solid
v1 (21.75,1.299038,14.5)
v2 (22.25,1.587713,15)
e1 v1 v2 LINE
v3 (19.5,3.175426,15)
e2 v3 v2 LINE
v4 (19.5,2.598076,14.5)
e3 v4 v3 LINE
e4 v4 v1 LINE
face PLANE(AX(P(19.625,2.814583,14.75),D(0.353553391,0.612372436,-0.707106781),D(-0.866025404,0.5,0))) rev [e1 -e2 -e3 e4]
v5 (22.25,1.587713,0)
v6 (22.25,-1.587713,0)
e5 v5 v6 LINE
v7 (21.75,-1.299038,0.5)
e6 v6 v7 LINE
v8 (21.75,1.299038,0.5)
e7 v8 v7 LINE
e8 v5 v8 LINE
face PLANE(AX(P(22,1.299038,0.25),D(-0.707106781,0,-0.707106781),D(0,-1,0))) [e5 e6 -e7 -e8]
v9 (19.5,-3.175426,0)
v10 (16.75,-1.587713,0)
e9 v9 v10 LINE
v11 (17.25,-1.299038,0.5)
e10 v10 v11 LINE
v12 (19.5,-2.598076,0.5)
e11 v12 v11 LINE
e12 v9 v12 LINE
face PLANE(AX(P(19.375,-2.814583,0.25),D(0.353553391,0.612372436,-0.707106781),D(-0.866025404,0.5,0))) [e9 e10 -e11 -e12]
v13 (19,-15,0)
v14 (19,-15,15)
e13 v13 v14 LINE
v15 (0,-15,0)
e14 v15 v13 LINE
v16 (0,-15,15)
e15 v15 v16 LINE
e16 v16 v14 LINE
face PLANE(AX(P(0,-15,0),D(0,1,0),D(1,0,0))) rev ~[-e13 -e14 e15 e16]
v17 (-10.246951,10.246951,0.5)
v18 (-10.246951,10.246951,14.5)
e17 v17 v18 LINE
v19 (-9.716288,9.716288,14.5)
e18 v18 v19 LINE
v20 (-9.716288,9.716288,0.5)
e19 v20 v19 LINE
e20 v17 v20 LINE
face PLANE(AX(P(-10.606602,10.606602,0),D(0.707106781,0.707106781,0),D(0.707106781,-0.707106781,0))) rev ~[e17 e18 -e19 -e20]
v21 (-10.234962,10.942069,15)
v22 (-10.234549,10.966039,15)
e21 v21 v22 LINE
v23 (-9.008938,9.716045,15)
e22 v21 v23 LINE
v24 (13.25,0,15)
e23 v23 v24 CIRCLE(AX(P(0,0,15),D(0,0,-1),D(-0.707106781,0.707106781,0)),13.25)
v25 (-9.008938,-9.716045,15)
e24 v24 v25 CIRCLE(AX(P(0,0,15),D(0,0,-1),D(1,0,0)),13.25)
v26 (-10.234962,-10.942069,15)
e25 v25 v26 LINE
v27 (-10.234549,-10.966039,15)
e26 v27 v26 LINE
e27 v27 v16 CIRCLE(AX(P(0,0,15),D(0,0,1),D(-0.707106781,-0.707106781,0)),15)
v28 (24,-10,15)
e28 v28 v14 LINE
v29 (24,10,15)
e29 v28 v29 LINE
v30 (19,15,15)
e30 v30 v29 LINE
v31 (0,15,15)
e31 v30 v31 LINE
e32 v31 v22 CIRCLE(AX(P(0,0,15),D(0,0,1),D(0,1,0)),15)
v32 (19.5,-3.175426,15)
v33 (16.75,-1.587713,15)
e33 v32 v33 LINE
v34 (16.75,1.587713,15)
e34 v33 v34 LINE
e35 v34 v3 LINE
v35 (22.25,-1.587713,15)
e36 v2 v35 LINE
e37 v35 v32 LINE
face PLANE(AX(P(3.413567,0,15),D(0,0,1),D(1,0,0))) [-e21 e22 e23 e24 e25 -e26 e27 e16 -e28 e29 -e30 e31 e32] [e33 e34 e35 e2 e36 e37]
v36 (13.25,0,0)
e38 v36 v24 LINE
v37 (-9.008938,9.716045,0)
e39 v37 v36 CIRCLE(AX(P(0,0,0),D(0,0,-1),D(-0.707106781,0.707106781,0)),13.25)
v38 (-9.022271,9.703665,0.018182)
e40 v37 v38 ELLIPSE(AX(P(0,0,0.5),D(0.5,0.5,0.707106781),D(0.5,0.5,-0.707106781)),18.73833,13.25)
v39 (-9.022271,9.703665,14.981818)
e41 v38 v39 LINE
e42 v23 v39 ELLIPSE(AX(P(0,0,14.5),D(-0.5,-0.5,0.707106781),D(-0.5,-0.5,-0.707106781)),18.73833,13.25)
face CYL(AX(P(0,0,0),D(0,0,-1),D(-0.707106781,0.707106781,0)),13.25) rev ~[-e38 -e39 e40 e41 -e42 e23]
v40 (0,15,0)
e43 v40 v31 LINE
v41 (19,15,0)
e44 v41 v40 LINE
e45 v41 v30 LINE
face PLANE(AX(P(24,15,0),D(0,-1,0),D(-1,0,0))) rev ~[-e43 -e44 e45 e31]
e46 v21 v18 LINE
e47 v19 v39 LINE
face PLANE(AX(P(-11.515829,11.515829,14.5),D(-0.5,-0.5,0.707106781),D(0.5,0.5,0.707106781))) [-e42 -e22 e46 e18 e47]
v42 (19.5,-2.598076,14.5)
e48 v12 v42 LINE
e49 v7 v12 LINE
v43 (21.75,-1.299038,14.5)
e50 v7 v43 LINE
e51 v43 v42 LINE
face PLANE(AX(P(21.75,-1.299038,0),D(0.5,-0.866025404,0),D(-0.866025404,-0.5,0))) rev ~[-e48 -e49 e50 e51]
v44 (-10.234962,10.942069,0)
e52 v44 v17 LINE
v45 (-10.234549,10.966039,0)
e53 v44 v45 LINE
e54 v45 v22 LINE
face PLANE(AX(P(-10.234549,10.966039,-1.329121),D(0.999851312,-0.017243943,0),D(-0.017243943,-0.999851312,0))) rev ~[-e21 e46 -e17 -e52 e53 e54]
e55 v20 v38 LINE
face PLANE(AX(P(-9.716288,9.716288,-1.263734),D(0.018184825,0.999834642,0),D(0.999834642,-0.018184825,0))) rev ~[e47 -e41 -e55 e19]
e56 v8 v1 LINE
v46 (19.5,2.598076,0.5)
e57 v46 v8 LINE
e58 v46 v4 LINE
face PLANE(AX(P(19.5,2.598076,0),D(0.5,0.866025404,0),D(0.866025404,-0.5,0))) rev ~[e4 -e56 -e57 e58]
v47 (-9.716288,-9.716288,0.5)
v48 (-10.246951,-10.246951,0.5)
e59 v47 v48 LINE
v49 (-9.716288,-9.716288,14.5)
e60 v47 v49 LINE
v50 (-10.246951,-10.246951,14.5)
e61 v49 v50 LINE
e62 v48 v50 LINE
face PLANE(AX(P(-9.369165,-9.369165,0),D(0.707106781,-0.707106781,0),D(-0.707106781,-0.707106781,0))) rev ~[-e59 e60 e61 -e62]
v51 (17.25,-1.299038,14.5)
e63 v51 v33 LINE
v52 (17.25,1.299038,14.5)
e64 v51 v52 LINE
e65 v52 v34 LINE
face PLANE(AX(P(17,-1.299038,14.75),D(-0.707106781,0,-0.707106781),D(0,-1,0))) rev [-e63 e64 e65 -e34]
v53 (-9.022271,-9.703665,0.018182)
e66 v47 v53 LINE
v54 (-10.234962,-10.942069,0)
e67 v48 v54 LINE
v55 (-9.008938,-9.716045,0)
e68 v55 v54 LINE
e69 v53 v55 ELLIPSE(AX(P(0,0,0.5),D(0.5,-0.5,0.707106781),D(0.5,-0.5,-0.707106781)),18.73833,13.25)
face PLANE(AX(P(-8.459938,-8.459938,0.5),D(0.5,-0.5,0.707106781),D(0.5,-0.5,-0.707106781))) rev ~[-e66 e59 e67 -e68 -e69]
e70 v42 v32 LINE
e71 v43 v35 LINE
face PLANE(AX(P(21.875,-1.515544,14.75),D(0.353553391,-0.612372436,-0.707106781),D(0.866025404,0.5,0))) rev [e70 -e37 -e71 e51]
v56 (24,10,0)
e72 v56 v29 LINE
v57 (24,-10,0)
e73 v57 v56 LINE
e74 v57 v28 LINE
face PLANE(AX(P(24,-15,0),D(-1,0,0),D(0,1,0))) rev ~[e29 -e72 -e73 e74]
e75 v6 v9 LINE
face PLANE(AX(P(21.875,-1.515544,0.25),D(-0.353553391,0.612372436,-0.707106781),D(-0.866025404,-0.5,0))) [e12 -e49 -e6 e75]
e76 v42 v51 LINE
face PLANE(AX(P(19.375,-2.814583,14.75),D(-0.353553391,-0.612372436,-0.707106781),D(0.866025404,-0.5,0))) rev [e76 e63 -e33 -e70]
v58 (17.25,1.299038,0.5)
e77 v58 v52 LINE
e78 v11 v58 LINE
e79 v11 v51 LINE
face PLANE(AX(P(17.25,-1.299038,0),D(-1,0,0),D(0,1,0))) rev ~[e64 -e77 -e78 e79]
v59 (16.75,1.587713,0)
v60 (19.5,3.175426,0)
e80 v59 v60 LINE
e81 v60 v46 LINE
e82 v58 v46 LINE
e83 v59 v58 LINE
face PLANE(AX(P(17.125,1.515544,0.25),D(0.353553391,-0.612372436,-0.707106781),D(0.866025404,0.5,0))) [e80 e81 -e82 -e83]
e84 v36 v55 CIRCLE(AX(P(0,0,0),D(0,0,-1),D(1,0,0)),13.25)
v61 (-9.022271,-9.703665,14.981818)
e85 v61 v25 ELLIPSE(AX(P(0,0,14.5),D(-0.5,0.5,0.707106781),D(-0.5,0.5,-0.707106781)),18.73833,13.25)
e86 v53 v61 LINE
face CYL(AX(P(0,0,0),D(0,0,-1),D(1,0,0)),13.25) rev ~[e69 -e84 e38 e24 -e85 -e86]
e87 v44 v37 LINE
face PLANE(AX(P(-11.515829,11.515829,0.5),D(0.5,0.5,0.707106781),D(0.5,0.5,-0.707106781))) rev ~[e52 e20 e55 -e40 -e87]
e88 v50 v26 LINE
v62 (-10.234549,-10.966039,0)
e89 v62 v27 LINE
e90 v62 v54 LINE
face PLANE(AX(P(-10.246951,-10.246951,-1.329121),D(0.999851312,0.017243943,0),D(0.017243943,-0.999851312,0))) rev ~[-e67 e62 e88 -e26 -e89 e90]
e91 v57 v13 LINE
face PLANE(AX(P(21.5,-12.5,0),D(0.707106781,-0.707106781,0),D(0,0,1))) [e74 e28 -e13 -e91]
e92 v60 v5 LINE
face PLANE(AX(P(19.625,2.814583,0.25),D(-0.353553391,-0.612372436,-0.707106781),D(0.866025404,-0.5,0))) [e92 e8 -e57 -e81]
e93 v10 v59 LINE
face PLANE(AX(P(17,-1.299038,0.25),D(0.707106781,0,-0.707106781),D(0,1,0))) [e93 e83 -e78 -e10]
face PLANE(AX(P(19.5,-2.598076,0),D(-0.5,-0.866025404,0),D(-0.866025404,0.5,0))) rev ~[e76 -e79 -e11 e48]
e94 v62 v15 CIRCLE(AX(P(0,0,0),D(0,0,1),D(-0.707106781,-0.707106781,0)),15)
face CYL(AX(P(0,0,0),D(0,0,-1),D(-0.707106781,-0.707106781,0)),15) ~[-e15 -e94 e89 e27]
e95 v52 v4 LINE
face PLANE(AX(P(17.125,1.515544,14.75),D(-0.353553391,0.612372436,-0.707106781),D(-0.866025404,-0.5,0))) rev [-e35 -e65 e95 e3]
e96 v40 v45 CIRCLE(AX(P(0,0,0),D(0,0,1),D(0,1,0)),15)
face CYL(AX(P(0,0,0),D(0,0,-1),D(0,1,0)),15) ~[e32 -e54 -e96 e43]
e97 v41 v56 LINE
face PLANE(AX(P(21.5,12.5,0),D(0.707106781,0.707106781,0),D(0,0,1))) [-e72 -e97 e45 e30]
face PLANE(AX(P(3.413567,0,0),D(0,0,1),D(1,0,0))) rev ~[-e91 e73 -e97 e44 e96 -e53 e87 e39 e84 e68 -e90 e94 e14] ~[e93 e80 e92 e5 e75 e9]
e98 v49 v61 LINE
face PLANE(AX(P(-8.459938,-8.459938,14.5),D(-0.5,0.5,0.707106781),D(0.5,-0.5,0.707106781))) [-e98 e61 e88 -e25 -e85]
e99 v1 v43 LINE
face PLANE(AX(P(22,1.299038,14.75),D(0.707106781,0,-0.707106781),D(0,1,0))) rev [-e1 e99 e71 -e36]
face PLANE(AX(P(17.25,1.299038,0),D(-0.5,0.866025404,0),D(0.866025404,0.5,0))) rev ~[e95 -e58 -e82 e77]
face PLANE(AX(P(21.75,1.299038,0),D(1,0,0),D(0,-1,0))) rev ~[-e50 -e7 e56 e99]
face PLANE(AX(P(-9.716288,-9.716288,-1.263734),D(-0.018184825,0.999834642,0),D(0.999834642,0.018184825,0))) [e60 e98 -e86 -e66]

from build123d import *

# Parameters (mm, degrees)
F1_DEPTH    = 15
F2_T1_DEPTH = 17.6582428067
F2_T3_DEPTH = 17.5274686085
F2_T5_DEPTH = 4.321682988
F2_T7_DEPTH = 4.321682988
F3_SIZE     = 5
F4_SIZE     = 0.5


# Not quite as in the source:
# - a fillet or chamfer that OpenCascade refuses, or shapes differently, is made with other operations: its cross-section is extruded or revolved along the edge and cut away or added


with BuildPart() as f1:
    # F0 (on Top) → F1 (new body)
    with BuildSketch(Plane.XY):
        with BuildLine():
            ThreePointArc((0, -15), (10.6066017178, -10.6066017178), (15, 0))
            ThreePointArc((15, 0), (10.6066017178, 10.6066017178), (0, 15))
            ThreePointArc((0, 15), (-5.7402514855, 13.8581929877), (-10.6066017178, 10.6066017178))
            Line((-10.6066017178, 10.6066017178), (-9.3691648507, 9.3691648507))
            ThreePointArc((-9.3691648507, 9.3691648507), (5.0705554788, 12.2414038058), (13.25, 0))
            ThreePointArc((13.25, 0), (5.0705554788, -12.2414038058), (-9.3691648507, -9.3691648507))
            Line((-9.3691648507, -9.3691648507), (-10.6066017178, -10.6066017178))
            ThreePointArc((-10.6066017178, -10.6066017178), (-5.7402514855, -13.8581929877), (0, -15))
        make_face()
        with BuildLine():
            ThreePointArc((0, 15), (10.6066017178, 10.6066017178), (15, 0))
            ThreePointArc((15, 0), (10.6066017178, -10.6066017178), (0, -15))
            Line((0, -15), (24, -15))
            Line((24, -15), (24, 15))
            Line((24, 15), (0, 15))
        make_face()
        Polygon((19.5, -2.5980762114), (17.25, -1.2990381057), (17.25, 1.2990381057), (19.5, 2.5980762114), (21.75, 1.2990381057), (21.75, -1.2990381057), align=None, mode=Mode.SUBTRACT)
    extrude(amount=F1_DEPTH)

    # F2: chamfer of 0.5 on 8 edges, made by hand

    # F2_s2 → F2_t1 (cut)
    with BuildSketch(Plane.XY.offset(-1.3291214034)):
        with BuildLine():
            Line((-10.234549009, 10.9660387826), (-10.246950766, 10.246950766))
            Line((-10.246950766, 10.246950766), (-10.6066017178, 10.6066017178))
            ThreePointArc((-10.6066017178, 10.6066017178), (-10.4170400144, 10.7928345368), (-10.234549009, 10.9660387826))
        make_face()
        with BuildLine():
            Line((-10.246950766, -10.246950766), (-10.234549009, -10.9660387826))
            ThreePointArc((-10.234549009, -10.9660387826), (-10.4170400144, -10.7928345368), (-10.6066017178, -10.6066017178))
            Line((-10.6066017178, -10.6066017178), (-10.246950766, -10.246950766))
        make_face()
    extrude(amount=F2_T1_DEPTH, mode=Mode.SUBTRACT)

    # F2_s4 → F2_t3 (cut)
    with BuildSketch(Plane.XY.offset(-1.2637343043)):
        with BuildLine():
            Line((-9.7162878714, 9.7162878714), (-9.0222714088, 9.7036652161))
            ThreePointArc((-9.0222714088, 9.7036652161), (-9.1921439944, 9.5429025346), (-9.3691648507, 9.3691648507))
            Line((-9.3691648507, 9.3691648507), (-9.7162878714, 9.7162878714))
        make_face()
        with BuildLine():
            Line((-9.7162878714, -9.7162878714), (-9.0222714088, -9.7036652161))
            ThreePointArc((-9.0222714088, -9.7036652161), (-9.1921439944, -9.5429025346), (-9.3691648507, -9.3691648507))
            Line((-9.3691648507, -9.3691648507), (-9.7162878714, -9.7162878714))
        make_face()
    extrude(amount=F2_T3_DEPTH, mode=Mode.SUBTRACT)

    # F2_s6 → F2_t5 (cut)
    with BuildSketch(Plane(origin=(-11.5158289577, 11.5158289577, 0), x_dir=(0, 0, 1), z_dir=(0.7071067812, -0.7071067812, 0))):
        Polygon((0.5, 0), (0, -0.5), (0, 0), align=None)
        Polygon((14.5, 0), (15, -0.5), (15, 0), align=None)
    extrude(amount=F2_T5_DEPTH, mode=Mode.SUBTRACT)

    # F2_s8 → F2_t7 (cut)
    with BuildSketch(Plane(origin=(-8.4599376108, -8.4599376108, 0), x_dir=(0, 0, 1), z_dir=(-0.7071067812, -0.7071067812, 0))):
        Polygon((0.5, 0), (0, -0.5), (0, 0), align=None)
        Polygon((14.5, 0), (15, -0.5), (15, 0), align=None)
    extrude(amount=F2_T7_DEPTH, mode=Mode.SUBTRACT)

    # F3
    f3_edges = [f1.edges().sort_by_distance(p)[0] for p in [
        (24, -15, 7.5),
        (24, 15, 7.5),
    ]]
    chamfer(f3_edges, length=F3_SIZE)

    # F4
    f4_edges = [f1.edges().sort_by_distance(p)[0] for p in [
        (18.375, 1.948557, 15),
        (20.625, 1.948557, 15),
        (21.75, 0, 15),
        (20.625, -1.948557, 15),
        (18.375, -1.948557, 15),
        (17.25, 0, 15),
        (20.625, 1.948557, 0),
        (21.75, 0, 0),
        (20.625, -1.948557, 0),
        (18.375, -1.948557, 0),
        (17.25, 0, 0),
        (18.375, 1.948557, 0),
    ]]
    chamfer(f4_edges, length=F4_SIZE)


solid = f1.part
